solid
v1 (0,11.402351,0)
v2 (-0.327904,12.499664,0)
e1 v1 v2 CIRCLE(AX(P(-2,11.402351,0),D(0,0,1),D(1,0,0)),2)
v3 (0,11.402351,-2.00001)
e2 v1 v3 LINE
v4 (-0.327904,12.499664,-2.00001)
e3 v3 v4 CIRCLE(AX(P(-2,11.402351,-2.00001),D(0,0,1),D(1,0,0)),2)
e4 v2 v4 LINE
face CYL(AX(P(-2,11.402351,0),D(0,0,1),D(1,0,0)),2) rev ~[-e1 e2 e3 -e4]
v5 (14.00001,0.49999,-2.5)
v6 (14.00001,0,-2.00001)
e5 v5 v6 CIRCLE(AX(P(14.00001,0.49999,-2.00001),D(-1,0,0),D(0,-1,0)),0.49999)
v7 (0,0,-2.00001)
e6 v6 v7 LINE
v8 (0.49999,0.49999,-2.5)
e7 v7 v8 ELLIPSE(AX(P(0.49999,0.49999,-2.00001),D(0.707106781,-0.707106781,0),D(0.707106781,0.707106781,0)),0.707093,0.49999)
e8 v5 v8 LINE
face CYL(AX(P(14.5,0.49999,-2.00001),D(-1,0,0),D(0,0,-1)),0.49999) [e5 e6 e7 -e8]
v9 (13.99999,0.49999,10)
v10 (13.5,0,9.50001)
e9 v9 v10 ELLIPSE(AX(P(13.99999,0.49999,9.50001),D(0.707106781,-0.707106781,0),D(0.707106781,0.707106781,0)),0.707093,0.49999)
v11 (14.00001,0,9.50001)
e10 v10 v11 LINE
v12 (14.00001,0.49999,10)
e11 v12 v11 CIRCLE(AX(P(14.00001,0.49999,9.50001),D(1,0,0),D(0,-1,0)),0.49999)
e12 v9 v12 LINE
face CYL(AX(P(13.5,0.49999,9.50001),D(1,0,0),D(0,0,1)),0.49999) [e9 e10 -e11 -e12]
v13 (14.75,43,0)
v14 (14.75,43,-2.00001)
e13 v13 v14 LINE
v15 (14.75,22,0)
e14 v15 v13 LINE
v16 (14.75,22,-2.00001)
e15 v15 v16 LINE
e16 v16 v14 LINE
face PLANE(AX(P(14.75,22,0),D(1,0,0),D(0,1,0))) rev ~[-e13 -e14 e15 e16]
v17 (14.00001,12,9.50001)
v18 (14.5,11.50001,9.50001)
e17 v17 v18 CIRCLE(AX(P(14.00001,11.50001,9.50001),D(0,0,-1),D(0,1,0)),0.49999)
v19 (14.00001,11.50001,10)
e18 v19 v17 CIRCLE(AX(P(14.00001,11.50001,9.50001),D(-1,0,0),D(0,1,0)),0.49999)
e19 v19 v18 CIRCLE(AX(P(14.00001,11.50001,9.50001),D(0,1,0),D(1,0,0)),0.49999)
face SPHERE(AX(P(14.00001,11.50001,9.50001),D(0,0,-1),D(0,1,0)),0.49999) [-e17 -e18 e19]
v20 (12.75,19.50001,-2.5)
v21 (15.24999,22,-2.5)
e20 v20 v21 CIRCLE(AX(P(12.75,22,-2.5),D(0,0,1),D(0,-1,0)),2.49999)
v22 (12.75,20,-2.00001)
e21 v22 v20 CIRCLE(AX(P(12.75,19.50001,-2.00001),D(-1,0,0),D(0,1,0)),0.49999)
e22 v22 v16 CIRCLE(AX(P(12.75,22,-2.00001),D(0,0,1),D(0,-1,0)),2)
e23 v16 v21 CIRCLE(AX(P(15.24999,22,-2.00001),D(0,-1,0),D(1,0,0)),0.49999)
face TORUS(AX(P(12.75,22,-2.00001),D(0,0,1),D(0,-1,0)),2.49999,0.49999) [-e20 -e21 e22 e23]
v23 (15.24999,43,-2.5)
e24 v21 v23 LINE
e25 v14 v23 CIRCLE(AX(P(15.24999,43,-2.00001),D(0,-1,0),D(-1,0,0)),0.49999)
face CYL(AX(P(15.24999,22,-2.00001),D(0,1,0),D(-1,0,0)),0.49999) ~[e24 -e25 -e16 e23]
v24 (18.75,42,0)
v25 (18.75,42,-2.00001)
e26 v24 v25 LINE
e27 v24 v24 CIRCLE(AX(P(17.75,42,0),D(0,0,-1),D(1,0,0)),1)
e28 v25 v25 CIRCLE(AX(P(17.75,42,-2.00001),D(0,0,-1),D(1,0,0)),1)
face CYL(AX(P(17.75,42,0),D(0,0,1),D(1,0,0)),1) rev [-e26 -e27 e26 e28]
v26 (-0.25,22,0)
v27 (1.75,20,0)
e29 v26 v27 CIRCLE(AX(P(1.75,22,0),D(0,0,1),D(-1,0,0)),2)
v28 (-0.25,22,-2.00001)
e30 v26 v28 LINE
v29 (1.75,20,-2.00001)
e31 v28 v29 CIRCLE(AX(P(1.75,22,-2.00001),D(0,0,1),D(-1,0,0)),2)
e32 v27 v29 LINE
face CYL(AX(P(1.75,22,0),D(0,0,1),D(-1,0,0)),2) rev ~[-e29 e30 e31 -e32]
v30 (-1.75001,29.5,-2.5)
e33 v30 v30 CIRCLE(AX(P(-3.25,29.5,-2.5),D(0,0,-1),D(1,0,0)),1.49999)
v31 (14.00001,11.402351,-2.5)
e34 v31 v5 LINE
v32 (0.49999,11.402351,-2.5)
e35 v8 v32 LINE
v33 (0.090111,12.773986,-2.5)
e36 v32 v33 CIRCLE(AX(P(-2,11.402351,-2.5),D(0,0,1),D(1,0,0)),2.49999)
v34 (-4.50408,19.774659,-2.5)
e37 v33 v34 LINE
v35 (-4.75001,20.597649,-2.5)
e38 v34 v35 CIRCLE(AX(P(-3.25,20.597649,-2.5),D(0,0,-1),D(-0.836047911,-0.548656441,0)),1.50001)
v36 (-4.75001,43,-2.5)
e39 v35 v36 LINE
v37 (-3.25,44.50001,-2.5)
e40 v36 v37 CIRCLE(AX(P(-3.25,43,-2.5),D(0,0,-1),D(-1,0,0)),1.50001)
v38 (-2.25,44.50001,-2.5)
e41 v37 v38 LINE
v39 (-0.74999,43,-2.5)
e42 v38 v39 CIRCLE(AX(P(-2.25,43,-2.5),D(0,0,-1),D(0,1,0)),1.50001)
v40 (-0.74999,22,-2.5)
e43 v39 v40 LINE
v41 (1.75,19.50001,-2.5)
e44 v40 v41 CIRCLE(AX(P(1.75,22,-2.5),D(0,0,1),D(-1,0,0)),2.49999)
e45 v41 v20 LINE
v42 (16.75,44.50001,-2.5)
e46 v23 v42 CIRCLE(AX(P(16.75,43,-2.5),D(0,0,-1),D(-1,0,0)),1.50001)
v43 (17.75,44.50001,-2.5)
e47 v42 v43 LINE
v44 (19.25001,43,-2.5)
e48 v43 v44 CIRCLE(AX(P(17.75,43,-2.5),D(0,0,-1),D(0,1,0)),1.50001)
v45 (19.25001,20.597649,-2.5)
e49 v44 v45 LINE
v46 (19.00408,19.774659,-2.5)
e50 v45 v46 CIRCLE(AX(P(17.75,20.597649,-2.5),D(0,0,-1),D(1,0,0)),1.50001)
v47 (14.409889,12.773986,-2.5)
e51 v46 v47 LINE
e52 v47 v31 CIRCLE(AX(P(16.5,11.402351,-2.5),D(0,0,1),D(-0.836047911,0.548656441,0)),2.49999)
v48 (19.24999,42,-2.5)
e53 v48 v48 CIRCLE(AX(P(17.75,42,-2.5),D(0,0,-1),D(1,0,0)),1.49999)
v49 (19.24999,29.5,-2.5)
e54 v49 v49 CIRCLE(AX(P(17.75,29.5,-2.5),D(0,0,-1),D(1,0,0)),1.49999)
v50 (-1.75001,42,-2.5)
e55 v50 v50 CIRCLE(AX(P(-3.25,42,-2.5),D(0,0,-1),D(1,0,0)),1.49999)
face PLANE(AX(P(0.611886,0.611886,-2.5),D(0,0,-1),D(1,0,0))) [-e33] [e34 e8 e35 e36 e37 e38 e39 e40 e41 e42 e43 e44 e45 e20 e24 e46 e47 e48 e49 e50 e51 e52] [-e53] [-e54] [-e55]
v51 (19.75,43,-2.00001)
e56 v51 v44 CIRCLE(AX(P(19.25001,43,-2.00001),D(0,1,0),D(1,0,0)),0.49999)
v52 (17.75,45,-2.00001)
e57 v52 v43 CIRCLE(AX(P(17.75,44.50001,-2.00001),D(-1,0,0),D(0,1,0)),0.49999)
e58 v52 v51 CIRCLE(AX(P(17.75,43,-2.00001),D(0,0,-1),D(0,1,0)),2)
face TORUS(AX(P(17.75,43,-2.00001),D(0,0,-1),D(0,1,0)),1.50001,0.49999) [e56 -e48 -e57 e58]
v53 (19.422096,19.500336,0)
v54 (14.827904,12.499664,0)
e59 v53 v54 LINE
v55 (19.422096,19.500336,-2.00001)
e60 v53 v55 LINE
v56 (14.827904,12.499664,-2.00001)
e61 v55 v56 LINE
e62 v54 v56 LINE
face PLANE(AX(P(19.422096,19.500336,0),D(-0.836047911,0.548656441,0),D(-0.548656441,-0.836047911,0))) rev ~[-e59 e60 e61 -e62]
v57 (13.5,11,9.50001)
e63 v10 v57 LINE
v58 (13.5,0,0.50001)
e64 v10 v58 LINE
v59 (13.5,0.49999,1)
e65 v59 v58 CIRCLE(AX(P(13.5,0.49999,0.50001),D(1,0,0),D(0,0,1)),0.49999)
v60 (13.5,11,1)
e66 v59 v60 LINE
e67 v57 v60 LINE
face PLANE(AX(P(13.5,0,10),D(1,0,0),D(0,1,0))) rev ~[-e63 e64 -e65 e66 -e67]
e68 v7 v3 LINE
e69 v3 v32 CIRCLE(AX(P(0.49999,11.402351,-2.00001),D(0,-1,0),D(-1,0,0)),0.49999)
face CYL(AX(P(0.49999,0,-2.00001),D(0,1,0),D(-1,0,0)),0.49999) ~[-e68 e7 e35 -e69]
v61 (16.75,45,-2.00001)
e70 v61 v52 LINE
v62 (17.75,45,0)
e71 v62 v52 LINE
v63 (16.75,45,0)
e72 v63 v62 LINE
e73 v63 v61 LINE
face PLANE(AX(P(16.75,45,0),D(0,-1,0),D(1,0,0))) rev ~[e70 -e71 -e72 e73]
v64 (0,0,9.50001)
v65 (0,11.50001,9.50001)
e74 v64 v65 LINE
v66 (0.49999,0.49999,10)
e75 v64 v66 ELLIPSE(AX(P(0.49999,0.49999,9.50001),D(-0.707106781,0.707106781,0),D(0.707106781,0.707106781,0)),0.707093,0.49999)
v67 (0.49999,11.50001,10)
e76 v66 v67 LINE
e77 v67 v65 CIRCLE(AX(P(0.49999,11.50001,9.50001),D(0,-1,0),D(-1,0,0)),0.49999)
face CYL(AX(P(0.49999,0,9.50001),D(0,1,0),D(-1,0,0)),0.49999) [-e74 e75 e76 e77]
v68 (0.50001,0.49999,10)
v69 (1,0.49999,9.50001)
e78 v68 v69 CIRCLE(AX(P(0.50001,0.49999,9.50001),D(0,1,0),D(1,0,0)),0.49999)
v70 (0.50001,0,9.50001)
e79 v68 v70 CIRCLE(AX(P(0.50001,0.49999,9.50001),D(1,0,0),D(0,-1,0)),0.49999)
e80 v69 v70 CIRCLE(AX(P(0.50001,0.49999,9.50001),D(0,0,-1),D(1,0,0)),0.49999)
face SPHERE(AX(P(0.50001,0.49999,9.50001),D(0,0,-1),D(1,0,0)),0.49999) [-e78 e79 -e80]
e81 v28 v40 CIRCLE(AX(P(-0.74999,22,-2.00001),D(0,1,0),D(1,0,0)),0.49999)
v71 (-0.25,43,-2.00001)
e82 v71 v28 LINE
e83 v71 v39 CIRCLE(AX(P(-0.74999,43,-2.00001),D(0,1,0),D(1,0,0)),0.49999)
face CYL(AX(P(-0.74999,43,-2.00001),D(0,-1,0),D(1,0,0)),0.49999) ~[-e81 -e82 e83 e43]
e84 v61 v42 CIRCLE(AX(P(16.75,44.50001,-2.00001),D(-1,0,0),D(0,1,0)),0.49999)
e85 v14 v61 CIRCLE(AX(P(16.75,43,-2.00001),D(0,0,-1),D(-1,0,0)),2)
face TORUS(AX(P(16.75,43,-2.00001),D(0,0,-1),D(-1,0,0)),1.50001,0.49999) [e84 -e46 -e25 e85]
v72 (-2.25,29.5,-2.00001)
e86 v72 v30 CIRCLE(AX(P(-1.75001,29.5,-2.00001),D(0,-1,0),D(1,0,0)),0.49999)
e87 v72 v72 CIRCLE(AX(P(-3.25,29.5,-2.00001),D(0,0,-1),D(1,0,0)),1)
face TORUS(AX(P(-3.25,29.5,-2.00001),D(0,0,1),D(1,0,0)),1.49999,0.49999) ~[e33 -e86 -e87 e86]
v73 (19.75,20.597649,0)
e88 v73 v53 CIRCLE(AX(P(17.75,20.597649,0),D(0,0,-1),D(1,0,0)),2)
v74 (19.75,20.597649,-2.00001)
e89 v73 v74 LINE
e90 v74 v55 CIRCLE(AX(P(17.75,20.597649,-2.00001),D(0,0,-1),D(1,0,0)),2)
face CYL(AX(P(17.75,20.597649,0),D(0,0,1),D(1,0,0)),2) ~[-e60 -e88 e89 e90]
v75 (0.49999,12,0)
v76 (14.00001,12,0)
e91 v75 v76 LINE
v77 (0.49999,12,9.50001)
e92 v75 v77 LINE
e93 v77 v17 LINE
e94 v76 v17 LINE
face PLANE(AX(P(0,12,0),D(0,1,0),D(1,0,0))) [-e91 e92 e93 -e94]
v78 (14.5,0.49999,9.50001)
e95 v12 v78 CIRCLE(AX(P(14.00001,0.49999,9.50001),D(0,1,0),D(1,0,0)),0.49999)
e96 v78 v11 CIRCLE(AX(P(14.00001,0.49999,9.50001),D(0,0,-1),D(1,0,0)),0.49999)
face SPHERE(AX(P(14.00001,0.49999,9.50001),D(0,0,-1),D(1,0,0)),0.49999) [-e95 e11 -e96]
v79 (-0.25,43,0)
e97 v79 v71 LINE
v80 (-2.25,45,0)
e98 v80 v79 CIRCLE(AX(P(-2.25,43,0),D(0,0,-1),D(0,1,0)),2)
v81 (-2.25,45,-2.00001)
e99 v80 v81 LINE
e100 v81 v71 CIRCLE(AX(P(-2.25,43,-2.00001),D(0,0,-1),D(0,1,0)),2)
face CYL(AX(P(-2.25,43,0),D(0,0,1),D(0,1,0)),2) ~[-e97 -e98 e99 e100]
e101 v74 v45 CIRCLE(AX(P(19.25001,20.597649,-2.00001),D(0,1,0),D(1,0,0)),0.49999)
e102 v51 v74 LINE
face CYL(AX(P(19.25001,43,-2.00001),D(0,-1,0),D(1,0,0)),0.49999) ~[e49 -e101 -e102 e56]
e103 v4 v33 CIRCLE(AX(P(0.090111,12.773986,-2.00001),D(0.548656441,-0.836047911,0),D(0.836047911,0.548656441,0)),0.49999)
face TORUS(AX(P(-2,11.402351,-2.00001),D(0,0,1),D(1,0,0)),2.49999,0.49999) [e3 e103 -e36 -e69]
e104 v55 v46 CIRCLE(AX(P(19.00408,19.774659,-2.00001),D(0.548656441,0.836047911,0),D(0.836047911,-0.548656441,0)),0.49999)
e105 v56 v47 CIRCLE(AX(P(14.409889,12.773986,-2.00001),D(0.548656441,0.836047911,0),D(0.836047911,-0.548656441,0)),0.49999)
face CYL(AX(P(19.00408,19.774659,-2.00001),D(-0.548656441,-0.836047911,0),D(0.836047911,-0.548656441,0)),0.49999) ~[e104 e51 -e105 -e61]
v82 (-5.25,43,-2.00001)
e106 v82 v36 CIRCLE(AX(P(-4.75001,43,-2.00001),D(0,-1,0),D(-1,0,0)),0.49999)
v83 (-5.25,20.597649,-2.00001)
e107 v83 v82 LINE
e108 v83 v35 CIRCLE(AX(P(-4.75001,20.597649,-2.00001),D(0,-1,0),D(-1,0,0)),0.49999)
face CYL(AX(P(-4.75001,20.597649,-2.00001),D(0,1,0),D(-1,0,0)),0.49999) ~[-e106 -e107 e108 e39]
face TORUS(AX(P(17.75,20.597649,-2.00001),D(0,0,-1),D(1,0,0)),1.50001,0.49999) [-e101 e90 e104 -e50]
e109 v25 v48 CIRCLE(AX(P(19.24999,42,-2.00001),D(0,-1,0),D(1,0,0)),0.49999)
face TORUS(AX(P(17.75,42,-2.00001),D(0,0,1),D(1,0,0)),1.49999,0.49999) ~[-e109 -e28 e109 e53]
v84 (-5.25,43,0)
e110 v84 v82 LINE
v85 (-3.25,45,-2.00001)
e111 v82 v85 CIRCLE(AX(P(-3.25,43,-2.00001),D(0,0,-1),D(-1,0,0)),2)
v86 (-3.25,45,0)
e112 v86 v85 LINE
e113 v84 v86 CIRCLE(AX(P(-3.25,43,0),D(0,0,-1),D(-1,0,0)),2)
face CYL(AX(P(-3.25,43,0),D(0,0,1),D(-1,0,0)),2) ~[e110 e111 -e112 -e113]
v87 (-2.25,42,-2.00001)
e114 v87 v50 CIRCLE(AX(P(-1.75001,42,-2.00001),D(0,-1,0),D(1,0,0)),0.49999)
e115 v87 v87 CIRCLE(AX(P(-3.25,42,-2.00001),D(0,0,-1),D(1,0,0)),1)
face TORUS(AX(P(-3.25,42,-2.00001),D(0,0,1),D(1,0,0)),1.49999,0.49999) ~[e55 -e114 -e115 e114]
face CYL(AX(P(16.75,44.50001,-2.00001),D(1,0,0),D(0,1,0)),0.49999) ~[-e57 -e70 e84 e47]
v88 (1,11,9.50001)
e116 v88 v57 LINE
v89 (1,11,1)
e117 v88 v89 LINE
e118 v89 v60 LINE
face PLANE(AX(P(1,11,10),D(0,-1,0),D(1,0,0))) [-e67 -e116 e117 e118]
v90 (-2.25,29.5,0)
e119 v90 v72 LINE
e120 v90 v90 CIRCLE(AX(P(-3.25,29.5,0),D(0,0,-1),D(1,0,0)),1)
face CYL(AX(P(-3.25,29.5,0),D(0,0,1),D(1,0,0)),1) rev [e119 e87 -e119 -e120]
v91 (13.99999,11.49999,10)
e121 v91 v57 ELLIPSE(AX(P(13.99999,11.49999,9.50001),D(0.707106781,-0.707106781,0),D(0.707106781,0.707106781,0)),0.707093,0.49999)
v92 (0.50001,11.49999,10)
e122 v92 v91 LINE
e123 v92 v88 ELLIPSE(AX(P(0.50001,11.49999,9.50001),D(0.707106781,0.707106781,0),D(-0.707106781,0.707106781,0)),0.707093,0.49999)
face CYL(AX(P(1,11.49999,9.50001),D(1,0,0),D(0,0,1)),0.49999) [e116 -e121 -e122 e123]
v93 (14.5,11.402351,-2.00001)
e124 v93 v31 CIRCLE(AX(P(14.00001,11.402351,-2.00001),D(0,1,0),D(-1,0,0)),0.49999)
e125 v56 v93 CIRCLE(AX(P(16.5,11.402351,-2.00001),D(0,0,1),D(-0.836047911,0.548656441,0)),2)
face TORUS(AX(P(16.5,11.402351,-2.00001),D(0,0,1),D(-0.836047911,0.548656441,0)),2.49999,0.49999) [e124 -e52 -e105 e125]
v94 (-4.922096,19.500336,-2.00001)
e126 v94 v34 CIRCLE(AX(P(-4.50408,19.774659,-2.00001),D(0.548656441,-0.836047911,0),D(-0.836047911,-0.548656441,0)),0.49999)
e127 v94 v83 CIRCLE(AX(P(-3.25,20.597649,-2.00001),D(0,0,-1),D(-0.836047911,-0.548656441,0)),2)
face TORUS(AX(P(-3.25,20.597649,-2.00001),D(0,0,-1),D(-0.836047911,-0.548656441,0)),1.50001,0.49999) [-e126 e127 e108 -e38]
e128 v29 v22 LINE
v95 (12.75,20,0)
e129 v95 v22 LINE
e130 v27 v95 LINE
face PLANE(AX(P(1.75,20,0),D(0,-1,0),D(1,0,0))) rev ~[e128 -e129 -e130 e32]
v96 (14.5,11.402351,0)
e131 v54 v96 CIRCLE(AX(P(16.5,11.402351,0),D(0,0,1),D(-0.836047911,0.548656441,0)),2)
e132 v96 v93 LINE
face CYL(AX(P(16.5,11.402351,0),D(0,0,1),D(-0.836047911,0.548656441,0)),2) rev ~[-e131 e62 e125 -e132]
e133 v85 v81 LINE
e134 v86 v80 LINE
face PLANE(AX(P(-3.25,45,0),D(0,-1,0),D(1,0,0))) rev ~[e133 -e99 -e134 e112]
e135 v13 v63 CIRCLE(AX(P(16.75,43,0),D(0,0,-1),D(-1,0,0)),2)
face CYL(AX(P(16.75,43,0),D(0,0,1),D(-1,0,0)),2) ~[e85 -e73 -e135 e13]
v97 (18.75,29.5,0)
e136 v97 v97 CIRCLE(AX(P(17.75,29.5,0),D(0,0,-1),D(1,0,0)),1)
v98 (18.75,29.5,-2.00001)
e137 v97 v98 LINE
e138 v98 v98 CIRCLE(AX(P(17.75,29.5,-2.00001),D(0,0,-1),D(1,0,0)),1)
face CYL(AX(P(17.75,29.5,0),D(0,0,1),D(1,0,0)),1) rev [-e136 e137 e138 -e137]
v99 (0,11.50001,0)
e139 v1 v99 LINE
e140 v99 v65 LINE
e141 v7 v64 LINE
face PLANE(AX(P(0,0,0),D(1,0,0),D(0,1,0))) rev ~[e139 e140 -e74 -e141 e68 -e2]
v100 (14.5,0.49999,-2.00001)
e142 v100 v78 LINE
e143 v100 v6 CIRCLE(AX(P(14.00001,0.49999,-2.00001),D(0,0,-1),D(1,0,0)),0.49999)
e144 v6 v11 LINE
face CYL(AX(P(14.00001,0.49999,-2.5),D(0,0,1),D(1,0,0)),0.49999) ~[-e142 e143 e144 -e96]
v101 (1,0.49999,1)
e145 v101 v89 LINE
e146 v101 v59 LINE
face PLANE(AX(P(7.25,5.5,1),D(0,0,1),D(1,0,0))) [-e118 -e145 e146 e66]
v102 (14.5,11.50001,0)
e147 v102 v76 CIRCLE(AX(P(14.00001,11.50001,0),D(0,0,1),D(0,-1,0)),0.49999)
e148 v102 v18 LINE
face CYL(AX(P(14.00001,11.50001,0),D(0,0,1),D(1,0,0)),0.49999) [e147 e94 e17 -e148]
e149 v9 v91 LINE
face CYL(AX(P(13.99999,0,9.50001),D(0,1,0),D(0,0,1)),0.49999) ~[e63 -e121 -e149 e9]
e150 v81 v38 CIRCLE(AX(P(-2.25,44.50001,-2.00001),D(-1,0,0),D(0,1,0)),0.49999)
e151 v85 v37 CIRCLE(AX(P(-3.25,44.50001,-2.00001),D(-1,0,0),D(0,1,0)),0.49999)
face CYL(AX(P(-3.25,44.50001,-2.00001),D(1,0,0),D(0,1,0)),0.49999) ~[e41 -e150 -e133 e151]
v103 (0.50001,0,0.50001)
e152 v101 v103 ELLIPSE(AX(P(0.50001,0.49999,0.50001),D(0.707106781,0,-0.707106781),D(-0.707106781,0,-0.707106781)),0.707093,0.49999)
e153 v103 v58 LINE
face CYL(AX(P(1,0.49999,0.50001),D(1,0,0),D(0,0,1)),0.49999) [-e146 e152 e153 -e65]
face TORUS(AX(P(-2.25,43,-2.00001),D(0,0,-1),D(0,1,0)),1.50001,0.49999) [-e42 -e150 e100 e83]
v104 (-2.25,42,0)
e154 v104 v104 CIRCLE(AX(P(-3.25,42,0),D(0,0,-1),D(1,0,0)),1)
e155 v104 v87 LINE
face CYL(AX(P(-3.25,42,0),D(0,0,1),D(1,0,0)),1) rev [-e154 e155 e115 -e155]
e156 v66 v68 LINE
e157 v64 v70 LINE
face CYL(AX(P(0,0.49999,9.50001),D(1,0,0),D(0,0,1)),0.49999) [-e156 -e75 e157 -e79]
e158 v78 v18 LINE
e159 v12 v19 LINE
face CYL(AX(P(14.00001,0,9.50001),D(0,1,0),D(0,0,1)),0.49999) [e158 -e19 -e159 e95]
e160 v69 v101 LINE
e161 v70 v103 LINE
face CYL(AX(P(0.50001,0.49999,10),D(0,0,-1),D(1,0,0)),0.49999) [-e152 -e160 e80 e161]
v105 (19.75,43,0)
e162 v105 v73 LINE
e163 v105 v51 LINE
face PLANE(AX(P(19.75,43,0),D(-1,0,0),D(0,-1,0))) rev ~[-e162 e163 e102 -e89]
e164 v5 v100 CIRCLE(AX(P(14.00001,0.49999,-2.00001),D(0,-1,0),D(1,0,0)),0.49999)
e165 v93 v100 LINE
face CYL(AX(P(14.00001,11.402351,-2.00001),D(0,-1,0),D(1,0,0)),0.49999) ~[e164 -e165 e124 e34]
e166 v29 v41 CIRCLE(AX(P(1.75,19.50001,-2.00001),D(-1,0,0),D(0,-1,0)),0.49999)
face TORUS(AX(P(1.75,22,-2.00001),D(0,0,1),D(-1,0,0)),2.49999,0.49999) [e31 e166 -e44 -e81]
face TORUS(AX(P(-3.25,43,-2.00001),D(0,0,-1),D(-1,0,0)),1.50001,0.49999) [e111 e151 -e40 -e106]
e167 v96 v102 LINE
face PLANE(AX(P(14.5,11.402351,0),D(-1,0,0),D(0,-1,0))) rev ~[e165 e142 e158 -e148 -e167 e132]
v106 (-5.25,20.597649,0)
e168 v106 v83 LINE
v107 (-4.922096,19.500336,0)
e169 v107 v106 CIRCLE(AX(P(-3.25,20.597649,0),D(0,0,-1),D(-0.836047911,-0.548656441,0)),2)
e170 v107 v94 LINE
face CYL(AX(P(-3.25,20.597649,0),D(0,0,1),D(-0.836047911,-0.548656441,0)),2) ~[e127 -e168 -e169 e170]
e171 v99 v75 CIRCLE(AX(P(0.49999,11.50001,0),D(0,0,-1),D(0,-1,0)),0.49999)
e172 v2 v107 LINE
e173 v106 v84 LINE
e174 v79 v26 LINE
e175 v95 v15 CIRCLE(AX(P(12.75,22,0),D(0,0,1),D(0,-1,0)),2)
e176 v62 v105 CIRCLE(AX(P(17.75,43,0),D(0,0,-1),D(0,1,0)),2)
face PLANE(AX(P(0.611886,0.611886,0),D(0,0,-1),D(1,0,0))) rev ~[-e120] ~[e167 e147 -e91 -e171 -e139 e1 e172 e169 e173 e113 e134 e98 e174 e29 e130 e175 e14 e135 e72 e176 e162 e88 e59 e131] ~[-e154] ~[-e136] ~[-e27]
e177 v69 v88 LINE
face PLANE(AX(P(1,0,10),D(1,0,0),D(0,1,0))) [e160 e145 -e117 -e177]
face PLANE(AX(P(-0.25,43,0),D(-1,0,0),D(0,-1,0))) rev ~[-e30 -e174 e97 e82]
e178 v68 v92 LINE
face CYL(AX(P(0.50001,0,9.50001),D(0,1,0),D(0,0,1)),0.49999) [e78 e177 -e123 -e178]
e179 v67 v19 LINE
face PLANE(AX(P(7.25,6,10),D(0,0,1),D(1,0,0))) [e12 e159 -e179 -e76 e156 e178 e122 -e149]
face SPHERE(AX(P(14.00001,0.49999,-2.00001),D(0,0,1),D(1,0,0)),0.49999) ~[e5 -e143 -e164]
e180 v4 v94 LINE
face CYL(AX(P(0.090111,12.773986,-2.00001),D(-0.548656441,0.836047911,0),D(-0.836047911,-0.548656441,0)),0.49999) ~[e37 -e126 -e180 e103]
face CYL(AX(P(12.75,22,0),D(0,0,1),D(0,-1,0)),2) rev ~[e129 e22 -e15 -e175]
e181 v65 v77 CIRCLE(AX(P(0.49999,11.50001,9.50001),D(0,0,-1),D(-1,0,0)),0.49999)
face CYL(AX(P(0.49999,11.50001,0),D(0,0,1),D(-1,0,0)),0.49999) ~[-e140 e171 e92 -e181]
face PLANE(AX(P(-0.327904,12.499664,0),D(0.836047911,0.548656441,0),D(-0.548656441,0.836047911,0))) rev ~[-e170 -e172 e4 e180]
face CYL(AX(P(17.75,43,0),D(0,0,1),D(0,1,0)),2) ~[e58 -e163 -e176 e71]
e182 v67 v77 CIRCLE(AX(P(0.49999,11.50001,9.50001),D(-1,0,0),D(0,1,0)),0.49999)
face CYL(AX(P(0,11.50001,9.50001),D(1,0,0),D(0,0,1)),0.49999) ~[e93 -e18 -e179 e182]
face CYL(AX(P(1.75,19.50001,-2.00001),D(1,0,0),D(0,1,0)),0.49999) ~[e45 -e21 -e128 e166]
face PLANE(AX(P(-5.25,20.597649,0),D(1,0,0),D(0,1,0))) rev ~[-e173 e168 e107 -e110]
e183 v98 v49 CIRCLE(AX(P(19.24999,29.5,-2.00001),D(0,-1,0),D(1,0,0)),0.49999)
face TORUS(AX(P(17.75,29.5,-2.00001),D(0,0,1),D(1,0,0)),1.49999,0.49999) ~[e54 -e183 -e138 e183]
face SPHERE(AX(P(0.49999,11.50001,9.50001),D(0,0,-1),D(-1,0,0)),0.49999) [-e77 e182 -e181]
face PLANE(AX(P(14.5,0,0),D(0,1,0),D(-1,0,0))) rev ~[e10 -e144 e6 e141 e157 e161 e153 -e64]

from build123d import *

# Parameters (mm, degrees)
F0_W     = 14.5
F0_H     = 12
F1_DEPTH = 10
F2_W     = 12.5
F2_H     = 11
F3_DEPTH = 9
F4_R     = 1
F5_DEPTH = 2.5
F6_R     = 0.49999


# Not quite as in the source:
# - a fillet or chamfer is up to 0.001 mm smaller than in the source, because OpenCascade refuses the exact size


with BuildPart() as f1:
    # F0 (on Top) → F1 (new body)
    with BuildSketch(Plane.XY):
        with Locations((7.25, 6)):
            Rectangle(F0_W, F0_H)
    extrude(amount=F1_DEPTH)

    # F2 (on face) → F3 (cut)
    with BuildSketch(Plane.XY.offset(10)):
        with Locations((7.25, 5.5)):
            Rectangle(F2_W, F2_H)
    extrude(amount=-F3_DEPTH, mode=Mode.SUBTRACT)

    # F4 (on face) → F5 (join)
    with BuildSketch(Plane(origin=(0, 0, 0), x_dir=(1, 0, 0), z_dir=(0, 0, -1))):
        with BuildLine():
            ThreePointArc((0, -2), (0.5857864376, -0.5857864376), (2, 0))
            Line((2, 0), (0, 0))
            Line((0, 0), (0, -2))
        make_face()
        with BuildLine():
            Line((12.5, 0), (2, 0))
            ThreePointArc((2, 0), (0.5857864376, -0.5857864376), (0, -2))
            Line((0, -2), (0, -11.4023506269))
            ThreePointArc((0, -11.4023506269), (-0.083728667, -11.9749798073), (-0.3279041783, -12.4996635098))
            Line((-0.3279041783, -12.4996635098), (-4.9220958217, -19.5003364902))
            ThreePointArc((-4.9220958217, -19.5003364902), (-5.166271333, -20.0250201927), (-5.25, -20.5976493731))
            Line((-5.25, -20.5976493731), (-5.25, -43))
            ThreePointArc((-5.25, -43), (-4.6642135624, -44.4142135624), (-3.25, -45))
            Line((-3.25, -45), (-2.2500000894, -45))
            ThreePointArc((-2.2500000894, -45), (-0.835786527, -44.4142135624), (-0.2500000894, -43))
            Line((-0.2500000894, -43), (-0.2500000894, -22))
            ThreePointArc((-0.2500000894, -22), (0.3357863482, -20.5857864376), (1.7499999106, -20))
            Line((1.7499999106, -20), (12.7500000894, -20))
            ThreePointArc((12.7500000894, -20), (14.1642136518, -20.5857864376), (14.7500000894, -22))
            Line((14.7500000894, -22), (14.7500000894, -43))
            ThreePointArc((14.7500000894, -43), (15.335786527, -44.4142135624), (16.7500000894, -45))
            Line((16.7500000894, -45), (17.75, -45))
            ThreePointArc((17.75, -45), (19.1642135624, -44.4142135624), (19.75, -43))
            Line((19.75, -43), (19.75, -20.5976493731))
            ThreePointArc((19.75, -20.5976493731), (19.666271333, -20.0250201927), (19.4220958217, -19.5003364902))
            Line((19.4220958217, -19.5003364902), (14.8279041783, -12.4996635098))
            ThreePointArc((14.8279041783, -12.4996635098), (14.583728667, -11.9749798073), (14.5, -11.4023506269))
            Line((14.5, -11.4023506269), (14.5, -2))
            ThreePointArc((14.5, -2), (13.9142135624, -0.5857864376), (12.5, 0))
        make_face()
        with Locations((-3.25, -42)):
            Circle(F4_R, mode=Mode.SUBTRACT)
        with Locations((-3.25, -29.5)):
            Circle(F4_R, mode=Mode.SUBTRACT)
        with Locations((17.75, -42)):
            Circle(F4_R, mode=Mode.SUBTRACT)
        with Locations((17.75, -29.5)):
            Circle(F4_R, mode=Mode.SUBTRACT)
        with BuildLine():
            Line((14.5, 0), (12.5, 0))
            ThreePointArc((12.5, 0), (13.9142135624, -0.5857864376), (14.5, -2))
            Line((14.5, -2), (14.5, 0))
        make_face()
    extrude(amount=F5_DEPTH)

    # F6 (radius 0.5 in the source; OpenCascade refuses exactly that, so slightly less here)
    f6_edges = [f1.edges().sort_by_distance(p)[0] for p in [
        (14.5, 12, 5),
        (0, 12, 5),
        (14.5, 0, 3.75),
        (1, 0, 5.5),
        (14.5, 5.701175, -2.5),
        (0, 5.701175, -2.5),
        (-0.083729, 11.97498, -2.5),
        (-2.625, 16, -2.5),
        (-5.166271, 20.02502, -2.5),
        (-5.25, 31.798825, -2.5),
        (-4.664214, 44.414214, -2.5),
        (-2.75, 45, -2.5),
        (-0.835787, 44.414214, -2.5),
        (-0.25, 32.5, -2.5),
        (0.335786, 20.585786, -2.5),
        (7.25, 20, -2.5),
        (14.164214, 20.585786, -2.5),
        (14.75, 32.5, -2.5),
        (15.335787, 44.414214, -2.5),
        (17.25, 45, -2.5),
        (19.164214, 44.414214, -2.5),
        (19.75, 31.798825, -2.5),
        (19.666271, 20.02502, -2.5),
        (17.125, 16, -2.5),
        (14.583729, 11.97498, -2.5),
        (7.25, 0, -2.5),
        (16.75, 29.5, -2.5),
        (-4.25, 42, -2.5),
        (-4.25, 29.5, -2.5),
        (16.75, 42, -2.5),
        (7.25, 0, 1),
        (0, 6, 10),
        (1, 5.5, 10),
        (7.25, 11, 10),
        (7.25, 12, 10),
        (14.5, 6, 10),
        (14, 0, 10),
        (13.5, 5.5, 10),
        (0.5, 0, 10),
    ]]
    fillet(f6_edges, radius=F6_R)


solid = f1.part
